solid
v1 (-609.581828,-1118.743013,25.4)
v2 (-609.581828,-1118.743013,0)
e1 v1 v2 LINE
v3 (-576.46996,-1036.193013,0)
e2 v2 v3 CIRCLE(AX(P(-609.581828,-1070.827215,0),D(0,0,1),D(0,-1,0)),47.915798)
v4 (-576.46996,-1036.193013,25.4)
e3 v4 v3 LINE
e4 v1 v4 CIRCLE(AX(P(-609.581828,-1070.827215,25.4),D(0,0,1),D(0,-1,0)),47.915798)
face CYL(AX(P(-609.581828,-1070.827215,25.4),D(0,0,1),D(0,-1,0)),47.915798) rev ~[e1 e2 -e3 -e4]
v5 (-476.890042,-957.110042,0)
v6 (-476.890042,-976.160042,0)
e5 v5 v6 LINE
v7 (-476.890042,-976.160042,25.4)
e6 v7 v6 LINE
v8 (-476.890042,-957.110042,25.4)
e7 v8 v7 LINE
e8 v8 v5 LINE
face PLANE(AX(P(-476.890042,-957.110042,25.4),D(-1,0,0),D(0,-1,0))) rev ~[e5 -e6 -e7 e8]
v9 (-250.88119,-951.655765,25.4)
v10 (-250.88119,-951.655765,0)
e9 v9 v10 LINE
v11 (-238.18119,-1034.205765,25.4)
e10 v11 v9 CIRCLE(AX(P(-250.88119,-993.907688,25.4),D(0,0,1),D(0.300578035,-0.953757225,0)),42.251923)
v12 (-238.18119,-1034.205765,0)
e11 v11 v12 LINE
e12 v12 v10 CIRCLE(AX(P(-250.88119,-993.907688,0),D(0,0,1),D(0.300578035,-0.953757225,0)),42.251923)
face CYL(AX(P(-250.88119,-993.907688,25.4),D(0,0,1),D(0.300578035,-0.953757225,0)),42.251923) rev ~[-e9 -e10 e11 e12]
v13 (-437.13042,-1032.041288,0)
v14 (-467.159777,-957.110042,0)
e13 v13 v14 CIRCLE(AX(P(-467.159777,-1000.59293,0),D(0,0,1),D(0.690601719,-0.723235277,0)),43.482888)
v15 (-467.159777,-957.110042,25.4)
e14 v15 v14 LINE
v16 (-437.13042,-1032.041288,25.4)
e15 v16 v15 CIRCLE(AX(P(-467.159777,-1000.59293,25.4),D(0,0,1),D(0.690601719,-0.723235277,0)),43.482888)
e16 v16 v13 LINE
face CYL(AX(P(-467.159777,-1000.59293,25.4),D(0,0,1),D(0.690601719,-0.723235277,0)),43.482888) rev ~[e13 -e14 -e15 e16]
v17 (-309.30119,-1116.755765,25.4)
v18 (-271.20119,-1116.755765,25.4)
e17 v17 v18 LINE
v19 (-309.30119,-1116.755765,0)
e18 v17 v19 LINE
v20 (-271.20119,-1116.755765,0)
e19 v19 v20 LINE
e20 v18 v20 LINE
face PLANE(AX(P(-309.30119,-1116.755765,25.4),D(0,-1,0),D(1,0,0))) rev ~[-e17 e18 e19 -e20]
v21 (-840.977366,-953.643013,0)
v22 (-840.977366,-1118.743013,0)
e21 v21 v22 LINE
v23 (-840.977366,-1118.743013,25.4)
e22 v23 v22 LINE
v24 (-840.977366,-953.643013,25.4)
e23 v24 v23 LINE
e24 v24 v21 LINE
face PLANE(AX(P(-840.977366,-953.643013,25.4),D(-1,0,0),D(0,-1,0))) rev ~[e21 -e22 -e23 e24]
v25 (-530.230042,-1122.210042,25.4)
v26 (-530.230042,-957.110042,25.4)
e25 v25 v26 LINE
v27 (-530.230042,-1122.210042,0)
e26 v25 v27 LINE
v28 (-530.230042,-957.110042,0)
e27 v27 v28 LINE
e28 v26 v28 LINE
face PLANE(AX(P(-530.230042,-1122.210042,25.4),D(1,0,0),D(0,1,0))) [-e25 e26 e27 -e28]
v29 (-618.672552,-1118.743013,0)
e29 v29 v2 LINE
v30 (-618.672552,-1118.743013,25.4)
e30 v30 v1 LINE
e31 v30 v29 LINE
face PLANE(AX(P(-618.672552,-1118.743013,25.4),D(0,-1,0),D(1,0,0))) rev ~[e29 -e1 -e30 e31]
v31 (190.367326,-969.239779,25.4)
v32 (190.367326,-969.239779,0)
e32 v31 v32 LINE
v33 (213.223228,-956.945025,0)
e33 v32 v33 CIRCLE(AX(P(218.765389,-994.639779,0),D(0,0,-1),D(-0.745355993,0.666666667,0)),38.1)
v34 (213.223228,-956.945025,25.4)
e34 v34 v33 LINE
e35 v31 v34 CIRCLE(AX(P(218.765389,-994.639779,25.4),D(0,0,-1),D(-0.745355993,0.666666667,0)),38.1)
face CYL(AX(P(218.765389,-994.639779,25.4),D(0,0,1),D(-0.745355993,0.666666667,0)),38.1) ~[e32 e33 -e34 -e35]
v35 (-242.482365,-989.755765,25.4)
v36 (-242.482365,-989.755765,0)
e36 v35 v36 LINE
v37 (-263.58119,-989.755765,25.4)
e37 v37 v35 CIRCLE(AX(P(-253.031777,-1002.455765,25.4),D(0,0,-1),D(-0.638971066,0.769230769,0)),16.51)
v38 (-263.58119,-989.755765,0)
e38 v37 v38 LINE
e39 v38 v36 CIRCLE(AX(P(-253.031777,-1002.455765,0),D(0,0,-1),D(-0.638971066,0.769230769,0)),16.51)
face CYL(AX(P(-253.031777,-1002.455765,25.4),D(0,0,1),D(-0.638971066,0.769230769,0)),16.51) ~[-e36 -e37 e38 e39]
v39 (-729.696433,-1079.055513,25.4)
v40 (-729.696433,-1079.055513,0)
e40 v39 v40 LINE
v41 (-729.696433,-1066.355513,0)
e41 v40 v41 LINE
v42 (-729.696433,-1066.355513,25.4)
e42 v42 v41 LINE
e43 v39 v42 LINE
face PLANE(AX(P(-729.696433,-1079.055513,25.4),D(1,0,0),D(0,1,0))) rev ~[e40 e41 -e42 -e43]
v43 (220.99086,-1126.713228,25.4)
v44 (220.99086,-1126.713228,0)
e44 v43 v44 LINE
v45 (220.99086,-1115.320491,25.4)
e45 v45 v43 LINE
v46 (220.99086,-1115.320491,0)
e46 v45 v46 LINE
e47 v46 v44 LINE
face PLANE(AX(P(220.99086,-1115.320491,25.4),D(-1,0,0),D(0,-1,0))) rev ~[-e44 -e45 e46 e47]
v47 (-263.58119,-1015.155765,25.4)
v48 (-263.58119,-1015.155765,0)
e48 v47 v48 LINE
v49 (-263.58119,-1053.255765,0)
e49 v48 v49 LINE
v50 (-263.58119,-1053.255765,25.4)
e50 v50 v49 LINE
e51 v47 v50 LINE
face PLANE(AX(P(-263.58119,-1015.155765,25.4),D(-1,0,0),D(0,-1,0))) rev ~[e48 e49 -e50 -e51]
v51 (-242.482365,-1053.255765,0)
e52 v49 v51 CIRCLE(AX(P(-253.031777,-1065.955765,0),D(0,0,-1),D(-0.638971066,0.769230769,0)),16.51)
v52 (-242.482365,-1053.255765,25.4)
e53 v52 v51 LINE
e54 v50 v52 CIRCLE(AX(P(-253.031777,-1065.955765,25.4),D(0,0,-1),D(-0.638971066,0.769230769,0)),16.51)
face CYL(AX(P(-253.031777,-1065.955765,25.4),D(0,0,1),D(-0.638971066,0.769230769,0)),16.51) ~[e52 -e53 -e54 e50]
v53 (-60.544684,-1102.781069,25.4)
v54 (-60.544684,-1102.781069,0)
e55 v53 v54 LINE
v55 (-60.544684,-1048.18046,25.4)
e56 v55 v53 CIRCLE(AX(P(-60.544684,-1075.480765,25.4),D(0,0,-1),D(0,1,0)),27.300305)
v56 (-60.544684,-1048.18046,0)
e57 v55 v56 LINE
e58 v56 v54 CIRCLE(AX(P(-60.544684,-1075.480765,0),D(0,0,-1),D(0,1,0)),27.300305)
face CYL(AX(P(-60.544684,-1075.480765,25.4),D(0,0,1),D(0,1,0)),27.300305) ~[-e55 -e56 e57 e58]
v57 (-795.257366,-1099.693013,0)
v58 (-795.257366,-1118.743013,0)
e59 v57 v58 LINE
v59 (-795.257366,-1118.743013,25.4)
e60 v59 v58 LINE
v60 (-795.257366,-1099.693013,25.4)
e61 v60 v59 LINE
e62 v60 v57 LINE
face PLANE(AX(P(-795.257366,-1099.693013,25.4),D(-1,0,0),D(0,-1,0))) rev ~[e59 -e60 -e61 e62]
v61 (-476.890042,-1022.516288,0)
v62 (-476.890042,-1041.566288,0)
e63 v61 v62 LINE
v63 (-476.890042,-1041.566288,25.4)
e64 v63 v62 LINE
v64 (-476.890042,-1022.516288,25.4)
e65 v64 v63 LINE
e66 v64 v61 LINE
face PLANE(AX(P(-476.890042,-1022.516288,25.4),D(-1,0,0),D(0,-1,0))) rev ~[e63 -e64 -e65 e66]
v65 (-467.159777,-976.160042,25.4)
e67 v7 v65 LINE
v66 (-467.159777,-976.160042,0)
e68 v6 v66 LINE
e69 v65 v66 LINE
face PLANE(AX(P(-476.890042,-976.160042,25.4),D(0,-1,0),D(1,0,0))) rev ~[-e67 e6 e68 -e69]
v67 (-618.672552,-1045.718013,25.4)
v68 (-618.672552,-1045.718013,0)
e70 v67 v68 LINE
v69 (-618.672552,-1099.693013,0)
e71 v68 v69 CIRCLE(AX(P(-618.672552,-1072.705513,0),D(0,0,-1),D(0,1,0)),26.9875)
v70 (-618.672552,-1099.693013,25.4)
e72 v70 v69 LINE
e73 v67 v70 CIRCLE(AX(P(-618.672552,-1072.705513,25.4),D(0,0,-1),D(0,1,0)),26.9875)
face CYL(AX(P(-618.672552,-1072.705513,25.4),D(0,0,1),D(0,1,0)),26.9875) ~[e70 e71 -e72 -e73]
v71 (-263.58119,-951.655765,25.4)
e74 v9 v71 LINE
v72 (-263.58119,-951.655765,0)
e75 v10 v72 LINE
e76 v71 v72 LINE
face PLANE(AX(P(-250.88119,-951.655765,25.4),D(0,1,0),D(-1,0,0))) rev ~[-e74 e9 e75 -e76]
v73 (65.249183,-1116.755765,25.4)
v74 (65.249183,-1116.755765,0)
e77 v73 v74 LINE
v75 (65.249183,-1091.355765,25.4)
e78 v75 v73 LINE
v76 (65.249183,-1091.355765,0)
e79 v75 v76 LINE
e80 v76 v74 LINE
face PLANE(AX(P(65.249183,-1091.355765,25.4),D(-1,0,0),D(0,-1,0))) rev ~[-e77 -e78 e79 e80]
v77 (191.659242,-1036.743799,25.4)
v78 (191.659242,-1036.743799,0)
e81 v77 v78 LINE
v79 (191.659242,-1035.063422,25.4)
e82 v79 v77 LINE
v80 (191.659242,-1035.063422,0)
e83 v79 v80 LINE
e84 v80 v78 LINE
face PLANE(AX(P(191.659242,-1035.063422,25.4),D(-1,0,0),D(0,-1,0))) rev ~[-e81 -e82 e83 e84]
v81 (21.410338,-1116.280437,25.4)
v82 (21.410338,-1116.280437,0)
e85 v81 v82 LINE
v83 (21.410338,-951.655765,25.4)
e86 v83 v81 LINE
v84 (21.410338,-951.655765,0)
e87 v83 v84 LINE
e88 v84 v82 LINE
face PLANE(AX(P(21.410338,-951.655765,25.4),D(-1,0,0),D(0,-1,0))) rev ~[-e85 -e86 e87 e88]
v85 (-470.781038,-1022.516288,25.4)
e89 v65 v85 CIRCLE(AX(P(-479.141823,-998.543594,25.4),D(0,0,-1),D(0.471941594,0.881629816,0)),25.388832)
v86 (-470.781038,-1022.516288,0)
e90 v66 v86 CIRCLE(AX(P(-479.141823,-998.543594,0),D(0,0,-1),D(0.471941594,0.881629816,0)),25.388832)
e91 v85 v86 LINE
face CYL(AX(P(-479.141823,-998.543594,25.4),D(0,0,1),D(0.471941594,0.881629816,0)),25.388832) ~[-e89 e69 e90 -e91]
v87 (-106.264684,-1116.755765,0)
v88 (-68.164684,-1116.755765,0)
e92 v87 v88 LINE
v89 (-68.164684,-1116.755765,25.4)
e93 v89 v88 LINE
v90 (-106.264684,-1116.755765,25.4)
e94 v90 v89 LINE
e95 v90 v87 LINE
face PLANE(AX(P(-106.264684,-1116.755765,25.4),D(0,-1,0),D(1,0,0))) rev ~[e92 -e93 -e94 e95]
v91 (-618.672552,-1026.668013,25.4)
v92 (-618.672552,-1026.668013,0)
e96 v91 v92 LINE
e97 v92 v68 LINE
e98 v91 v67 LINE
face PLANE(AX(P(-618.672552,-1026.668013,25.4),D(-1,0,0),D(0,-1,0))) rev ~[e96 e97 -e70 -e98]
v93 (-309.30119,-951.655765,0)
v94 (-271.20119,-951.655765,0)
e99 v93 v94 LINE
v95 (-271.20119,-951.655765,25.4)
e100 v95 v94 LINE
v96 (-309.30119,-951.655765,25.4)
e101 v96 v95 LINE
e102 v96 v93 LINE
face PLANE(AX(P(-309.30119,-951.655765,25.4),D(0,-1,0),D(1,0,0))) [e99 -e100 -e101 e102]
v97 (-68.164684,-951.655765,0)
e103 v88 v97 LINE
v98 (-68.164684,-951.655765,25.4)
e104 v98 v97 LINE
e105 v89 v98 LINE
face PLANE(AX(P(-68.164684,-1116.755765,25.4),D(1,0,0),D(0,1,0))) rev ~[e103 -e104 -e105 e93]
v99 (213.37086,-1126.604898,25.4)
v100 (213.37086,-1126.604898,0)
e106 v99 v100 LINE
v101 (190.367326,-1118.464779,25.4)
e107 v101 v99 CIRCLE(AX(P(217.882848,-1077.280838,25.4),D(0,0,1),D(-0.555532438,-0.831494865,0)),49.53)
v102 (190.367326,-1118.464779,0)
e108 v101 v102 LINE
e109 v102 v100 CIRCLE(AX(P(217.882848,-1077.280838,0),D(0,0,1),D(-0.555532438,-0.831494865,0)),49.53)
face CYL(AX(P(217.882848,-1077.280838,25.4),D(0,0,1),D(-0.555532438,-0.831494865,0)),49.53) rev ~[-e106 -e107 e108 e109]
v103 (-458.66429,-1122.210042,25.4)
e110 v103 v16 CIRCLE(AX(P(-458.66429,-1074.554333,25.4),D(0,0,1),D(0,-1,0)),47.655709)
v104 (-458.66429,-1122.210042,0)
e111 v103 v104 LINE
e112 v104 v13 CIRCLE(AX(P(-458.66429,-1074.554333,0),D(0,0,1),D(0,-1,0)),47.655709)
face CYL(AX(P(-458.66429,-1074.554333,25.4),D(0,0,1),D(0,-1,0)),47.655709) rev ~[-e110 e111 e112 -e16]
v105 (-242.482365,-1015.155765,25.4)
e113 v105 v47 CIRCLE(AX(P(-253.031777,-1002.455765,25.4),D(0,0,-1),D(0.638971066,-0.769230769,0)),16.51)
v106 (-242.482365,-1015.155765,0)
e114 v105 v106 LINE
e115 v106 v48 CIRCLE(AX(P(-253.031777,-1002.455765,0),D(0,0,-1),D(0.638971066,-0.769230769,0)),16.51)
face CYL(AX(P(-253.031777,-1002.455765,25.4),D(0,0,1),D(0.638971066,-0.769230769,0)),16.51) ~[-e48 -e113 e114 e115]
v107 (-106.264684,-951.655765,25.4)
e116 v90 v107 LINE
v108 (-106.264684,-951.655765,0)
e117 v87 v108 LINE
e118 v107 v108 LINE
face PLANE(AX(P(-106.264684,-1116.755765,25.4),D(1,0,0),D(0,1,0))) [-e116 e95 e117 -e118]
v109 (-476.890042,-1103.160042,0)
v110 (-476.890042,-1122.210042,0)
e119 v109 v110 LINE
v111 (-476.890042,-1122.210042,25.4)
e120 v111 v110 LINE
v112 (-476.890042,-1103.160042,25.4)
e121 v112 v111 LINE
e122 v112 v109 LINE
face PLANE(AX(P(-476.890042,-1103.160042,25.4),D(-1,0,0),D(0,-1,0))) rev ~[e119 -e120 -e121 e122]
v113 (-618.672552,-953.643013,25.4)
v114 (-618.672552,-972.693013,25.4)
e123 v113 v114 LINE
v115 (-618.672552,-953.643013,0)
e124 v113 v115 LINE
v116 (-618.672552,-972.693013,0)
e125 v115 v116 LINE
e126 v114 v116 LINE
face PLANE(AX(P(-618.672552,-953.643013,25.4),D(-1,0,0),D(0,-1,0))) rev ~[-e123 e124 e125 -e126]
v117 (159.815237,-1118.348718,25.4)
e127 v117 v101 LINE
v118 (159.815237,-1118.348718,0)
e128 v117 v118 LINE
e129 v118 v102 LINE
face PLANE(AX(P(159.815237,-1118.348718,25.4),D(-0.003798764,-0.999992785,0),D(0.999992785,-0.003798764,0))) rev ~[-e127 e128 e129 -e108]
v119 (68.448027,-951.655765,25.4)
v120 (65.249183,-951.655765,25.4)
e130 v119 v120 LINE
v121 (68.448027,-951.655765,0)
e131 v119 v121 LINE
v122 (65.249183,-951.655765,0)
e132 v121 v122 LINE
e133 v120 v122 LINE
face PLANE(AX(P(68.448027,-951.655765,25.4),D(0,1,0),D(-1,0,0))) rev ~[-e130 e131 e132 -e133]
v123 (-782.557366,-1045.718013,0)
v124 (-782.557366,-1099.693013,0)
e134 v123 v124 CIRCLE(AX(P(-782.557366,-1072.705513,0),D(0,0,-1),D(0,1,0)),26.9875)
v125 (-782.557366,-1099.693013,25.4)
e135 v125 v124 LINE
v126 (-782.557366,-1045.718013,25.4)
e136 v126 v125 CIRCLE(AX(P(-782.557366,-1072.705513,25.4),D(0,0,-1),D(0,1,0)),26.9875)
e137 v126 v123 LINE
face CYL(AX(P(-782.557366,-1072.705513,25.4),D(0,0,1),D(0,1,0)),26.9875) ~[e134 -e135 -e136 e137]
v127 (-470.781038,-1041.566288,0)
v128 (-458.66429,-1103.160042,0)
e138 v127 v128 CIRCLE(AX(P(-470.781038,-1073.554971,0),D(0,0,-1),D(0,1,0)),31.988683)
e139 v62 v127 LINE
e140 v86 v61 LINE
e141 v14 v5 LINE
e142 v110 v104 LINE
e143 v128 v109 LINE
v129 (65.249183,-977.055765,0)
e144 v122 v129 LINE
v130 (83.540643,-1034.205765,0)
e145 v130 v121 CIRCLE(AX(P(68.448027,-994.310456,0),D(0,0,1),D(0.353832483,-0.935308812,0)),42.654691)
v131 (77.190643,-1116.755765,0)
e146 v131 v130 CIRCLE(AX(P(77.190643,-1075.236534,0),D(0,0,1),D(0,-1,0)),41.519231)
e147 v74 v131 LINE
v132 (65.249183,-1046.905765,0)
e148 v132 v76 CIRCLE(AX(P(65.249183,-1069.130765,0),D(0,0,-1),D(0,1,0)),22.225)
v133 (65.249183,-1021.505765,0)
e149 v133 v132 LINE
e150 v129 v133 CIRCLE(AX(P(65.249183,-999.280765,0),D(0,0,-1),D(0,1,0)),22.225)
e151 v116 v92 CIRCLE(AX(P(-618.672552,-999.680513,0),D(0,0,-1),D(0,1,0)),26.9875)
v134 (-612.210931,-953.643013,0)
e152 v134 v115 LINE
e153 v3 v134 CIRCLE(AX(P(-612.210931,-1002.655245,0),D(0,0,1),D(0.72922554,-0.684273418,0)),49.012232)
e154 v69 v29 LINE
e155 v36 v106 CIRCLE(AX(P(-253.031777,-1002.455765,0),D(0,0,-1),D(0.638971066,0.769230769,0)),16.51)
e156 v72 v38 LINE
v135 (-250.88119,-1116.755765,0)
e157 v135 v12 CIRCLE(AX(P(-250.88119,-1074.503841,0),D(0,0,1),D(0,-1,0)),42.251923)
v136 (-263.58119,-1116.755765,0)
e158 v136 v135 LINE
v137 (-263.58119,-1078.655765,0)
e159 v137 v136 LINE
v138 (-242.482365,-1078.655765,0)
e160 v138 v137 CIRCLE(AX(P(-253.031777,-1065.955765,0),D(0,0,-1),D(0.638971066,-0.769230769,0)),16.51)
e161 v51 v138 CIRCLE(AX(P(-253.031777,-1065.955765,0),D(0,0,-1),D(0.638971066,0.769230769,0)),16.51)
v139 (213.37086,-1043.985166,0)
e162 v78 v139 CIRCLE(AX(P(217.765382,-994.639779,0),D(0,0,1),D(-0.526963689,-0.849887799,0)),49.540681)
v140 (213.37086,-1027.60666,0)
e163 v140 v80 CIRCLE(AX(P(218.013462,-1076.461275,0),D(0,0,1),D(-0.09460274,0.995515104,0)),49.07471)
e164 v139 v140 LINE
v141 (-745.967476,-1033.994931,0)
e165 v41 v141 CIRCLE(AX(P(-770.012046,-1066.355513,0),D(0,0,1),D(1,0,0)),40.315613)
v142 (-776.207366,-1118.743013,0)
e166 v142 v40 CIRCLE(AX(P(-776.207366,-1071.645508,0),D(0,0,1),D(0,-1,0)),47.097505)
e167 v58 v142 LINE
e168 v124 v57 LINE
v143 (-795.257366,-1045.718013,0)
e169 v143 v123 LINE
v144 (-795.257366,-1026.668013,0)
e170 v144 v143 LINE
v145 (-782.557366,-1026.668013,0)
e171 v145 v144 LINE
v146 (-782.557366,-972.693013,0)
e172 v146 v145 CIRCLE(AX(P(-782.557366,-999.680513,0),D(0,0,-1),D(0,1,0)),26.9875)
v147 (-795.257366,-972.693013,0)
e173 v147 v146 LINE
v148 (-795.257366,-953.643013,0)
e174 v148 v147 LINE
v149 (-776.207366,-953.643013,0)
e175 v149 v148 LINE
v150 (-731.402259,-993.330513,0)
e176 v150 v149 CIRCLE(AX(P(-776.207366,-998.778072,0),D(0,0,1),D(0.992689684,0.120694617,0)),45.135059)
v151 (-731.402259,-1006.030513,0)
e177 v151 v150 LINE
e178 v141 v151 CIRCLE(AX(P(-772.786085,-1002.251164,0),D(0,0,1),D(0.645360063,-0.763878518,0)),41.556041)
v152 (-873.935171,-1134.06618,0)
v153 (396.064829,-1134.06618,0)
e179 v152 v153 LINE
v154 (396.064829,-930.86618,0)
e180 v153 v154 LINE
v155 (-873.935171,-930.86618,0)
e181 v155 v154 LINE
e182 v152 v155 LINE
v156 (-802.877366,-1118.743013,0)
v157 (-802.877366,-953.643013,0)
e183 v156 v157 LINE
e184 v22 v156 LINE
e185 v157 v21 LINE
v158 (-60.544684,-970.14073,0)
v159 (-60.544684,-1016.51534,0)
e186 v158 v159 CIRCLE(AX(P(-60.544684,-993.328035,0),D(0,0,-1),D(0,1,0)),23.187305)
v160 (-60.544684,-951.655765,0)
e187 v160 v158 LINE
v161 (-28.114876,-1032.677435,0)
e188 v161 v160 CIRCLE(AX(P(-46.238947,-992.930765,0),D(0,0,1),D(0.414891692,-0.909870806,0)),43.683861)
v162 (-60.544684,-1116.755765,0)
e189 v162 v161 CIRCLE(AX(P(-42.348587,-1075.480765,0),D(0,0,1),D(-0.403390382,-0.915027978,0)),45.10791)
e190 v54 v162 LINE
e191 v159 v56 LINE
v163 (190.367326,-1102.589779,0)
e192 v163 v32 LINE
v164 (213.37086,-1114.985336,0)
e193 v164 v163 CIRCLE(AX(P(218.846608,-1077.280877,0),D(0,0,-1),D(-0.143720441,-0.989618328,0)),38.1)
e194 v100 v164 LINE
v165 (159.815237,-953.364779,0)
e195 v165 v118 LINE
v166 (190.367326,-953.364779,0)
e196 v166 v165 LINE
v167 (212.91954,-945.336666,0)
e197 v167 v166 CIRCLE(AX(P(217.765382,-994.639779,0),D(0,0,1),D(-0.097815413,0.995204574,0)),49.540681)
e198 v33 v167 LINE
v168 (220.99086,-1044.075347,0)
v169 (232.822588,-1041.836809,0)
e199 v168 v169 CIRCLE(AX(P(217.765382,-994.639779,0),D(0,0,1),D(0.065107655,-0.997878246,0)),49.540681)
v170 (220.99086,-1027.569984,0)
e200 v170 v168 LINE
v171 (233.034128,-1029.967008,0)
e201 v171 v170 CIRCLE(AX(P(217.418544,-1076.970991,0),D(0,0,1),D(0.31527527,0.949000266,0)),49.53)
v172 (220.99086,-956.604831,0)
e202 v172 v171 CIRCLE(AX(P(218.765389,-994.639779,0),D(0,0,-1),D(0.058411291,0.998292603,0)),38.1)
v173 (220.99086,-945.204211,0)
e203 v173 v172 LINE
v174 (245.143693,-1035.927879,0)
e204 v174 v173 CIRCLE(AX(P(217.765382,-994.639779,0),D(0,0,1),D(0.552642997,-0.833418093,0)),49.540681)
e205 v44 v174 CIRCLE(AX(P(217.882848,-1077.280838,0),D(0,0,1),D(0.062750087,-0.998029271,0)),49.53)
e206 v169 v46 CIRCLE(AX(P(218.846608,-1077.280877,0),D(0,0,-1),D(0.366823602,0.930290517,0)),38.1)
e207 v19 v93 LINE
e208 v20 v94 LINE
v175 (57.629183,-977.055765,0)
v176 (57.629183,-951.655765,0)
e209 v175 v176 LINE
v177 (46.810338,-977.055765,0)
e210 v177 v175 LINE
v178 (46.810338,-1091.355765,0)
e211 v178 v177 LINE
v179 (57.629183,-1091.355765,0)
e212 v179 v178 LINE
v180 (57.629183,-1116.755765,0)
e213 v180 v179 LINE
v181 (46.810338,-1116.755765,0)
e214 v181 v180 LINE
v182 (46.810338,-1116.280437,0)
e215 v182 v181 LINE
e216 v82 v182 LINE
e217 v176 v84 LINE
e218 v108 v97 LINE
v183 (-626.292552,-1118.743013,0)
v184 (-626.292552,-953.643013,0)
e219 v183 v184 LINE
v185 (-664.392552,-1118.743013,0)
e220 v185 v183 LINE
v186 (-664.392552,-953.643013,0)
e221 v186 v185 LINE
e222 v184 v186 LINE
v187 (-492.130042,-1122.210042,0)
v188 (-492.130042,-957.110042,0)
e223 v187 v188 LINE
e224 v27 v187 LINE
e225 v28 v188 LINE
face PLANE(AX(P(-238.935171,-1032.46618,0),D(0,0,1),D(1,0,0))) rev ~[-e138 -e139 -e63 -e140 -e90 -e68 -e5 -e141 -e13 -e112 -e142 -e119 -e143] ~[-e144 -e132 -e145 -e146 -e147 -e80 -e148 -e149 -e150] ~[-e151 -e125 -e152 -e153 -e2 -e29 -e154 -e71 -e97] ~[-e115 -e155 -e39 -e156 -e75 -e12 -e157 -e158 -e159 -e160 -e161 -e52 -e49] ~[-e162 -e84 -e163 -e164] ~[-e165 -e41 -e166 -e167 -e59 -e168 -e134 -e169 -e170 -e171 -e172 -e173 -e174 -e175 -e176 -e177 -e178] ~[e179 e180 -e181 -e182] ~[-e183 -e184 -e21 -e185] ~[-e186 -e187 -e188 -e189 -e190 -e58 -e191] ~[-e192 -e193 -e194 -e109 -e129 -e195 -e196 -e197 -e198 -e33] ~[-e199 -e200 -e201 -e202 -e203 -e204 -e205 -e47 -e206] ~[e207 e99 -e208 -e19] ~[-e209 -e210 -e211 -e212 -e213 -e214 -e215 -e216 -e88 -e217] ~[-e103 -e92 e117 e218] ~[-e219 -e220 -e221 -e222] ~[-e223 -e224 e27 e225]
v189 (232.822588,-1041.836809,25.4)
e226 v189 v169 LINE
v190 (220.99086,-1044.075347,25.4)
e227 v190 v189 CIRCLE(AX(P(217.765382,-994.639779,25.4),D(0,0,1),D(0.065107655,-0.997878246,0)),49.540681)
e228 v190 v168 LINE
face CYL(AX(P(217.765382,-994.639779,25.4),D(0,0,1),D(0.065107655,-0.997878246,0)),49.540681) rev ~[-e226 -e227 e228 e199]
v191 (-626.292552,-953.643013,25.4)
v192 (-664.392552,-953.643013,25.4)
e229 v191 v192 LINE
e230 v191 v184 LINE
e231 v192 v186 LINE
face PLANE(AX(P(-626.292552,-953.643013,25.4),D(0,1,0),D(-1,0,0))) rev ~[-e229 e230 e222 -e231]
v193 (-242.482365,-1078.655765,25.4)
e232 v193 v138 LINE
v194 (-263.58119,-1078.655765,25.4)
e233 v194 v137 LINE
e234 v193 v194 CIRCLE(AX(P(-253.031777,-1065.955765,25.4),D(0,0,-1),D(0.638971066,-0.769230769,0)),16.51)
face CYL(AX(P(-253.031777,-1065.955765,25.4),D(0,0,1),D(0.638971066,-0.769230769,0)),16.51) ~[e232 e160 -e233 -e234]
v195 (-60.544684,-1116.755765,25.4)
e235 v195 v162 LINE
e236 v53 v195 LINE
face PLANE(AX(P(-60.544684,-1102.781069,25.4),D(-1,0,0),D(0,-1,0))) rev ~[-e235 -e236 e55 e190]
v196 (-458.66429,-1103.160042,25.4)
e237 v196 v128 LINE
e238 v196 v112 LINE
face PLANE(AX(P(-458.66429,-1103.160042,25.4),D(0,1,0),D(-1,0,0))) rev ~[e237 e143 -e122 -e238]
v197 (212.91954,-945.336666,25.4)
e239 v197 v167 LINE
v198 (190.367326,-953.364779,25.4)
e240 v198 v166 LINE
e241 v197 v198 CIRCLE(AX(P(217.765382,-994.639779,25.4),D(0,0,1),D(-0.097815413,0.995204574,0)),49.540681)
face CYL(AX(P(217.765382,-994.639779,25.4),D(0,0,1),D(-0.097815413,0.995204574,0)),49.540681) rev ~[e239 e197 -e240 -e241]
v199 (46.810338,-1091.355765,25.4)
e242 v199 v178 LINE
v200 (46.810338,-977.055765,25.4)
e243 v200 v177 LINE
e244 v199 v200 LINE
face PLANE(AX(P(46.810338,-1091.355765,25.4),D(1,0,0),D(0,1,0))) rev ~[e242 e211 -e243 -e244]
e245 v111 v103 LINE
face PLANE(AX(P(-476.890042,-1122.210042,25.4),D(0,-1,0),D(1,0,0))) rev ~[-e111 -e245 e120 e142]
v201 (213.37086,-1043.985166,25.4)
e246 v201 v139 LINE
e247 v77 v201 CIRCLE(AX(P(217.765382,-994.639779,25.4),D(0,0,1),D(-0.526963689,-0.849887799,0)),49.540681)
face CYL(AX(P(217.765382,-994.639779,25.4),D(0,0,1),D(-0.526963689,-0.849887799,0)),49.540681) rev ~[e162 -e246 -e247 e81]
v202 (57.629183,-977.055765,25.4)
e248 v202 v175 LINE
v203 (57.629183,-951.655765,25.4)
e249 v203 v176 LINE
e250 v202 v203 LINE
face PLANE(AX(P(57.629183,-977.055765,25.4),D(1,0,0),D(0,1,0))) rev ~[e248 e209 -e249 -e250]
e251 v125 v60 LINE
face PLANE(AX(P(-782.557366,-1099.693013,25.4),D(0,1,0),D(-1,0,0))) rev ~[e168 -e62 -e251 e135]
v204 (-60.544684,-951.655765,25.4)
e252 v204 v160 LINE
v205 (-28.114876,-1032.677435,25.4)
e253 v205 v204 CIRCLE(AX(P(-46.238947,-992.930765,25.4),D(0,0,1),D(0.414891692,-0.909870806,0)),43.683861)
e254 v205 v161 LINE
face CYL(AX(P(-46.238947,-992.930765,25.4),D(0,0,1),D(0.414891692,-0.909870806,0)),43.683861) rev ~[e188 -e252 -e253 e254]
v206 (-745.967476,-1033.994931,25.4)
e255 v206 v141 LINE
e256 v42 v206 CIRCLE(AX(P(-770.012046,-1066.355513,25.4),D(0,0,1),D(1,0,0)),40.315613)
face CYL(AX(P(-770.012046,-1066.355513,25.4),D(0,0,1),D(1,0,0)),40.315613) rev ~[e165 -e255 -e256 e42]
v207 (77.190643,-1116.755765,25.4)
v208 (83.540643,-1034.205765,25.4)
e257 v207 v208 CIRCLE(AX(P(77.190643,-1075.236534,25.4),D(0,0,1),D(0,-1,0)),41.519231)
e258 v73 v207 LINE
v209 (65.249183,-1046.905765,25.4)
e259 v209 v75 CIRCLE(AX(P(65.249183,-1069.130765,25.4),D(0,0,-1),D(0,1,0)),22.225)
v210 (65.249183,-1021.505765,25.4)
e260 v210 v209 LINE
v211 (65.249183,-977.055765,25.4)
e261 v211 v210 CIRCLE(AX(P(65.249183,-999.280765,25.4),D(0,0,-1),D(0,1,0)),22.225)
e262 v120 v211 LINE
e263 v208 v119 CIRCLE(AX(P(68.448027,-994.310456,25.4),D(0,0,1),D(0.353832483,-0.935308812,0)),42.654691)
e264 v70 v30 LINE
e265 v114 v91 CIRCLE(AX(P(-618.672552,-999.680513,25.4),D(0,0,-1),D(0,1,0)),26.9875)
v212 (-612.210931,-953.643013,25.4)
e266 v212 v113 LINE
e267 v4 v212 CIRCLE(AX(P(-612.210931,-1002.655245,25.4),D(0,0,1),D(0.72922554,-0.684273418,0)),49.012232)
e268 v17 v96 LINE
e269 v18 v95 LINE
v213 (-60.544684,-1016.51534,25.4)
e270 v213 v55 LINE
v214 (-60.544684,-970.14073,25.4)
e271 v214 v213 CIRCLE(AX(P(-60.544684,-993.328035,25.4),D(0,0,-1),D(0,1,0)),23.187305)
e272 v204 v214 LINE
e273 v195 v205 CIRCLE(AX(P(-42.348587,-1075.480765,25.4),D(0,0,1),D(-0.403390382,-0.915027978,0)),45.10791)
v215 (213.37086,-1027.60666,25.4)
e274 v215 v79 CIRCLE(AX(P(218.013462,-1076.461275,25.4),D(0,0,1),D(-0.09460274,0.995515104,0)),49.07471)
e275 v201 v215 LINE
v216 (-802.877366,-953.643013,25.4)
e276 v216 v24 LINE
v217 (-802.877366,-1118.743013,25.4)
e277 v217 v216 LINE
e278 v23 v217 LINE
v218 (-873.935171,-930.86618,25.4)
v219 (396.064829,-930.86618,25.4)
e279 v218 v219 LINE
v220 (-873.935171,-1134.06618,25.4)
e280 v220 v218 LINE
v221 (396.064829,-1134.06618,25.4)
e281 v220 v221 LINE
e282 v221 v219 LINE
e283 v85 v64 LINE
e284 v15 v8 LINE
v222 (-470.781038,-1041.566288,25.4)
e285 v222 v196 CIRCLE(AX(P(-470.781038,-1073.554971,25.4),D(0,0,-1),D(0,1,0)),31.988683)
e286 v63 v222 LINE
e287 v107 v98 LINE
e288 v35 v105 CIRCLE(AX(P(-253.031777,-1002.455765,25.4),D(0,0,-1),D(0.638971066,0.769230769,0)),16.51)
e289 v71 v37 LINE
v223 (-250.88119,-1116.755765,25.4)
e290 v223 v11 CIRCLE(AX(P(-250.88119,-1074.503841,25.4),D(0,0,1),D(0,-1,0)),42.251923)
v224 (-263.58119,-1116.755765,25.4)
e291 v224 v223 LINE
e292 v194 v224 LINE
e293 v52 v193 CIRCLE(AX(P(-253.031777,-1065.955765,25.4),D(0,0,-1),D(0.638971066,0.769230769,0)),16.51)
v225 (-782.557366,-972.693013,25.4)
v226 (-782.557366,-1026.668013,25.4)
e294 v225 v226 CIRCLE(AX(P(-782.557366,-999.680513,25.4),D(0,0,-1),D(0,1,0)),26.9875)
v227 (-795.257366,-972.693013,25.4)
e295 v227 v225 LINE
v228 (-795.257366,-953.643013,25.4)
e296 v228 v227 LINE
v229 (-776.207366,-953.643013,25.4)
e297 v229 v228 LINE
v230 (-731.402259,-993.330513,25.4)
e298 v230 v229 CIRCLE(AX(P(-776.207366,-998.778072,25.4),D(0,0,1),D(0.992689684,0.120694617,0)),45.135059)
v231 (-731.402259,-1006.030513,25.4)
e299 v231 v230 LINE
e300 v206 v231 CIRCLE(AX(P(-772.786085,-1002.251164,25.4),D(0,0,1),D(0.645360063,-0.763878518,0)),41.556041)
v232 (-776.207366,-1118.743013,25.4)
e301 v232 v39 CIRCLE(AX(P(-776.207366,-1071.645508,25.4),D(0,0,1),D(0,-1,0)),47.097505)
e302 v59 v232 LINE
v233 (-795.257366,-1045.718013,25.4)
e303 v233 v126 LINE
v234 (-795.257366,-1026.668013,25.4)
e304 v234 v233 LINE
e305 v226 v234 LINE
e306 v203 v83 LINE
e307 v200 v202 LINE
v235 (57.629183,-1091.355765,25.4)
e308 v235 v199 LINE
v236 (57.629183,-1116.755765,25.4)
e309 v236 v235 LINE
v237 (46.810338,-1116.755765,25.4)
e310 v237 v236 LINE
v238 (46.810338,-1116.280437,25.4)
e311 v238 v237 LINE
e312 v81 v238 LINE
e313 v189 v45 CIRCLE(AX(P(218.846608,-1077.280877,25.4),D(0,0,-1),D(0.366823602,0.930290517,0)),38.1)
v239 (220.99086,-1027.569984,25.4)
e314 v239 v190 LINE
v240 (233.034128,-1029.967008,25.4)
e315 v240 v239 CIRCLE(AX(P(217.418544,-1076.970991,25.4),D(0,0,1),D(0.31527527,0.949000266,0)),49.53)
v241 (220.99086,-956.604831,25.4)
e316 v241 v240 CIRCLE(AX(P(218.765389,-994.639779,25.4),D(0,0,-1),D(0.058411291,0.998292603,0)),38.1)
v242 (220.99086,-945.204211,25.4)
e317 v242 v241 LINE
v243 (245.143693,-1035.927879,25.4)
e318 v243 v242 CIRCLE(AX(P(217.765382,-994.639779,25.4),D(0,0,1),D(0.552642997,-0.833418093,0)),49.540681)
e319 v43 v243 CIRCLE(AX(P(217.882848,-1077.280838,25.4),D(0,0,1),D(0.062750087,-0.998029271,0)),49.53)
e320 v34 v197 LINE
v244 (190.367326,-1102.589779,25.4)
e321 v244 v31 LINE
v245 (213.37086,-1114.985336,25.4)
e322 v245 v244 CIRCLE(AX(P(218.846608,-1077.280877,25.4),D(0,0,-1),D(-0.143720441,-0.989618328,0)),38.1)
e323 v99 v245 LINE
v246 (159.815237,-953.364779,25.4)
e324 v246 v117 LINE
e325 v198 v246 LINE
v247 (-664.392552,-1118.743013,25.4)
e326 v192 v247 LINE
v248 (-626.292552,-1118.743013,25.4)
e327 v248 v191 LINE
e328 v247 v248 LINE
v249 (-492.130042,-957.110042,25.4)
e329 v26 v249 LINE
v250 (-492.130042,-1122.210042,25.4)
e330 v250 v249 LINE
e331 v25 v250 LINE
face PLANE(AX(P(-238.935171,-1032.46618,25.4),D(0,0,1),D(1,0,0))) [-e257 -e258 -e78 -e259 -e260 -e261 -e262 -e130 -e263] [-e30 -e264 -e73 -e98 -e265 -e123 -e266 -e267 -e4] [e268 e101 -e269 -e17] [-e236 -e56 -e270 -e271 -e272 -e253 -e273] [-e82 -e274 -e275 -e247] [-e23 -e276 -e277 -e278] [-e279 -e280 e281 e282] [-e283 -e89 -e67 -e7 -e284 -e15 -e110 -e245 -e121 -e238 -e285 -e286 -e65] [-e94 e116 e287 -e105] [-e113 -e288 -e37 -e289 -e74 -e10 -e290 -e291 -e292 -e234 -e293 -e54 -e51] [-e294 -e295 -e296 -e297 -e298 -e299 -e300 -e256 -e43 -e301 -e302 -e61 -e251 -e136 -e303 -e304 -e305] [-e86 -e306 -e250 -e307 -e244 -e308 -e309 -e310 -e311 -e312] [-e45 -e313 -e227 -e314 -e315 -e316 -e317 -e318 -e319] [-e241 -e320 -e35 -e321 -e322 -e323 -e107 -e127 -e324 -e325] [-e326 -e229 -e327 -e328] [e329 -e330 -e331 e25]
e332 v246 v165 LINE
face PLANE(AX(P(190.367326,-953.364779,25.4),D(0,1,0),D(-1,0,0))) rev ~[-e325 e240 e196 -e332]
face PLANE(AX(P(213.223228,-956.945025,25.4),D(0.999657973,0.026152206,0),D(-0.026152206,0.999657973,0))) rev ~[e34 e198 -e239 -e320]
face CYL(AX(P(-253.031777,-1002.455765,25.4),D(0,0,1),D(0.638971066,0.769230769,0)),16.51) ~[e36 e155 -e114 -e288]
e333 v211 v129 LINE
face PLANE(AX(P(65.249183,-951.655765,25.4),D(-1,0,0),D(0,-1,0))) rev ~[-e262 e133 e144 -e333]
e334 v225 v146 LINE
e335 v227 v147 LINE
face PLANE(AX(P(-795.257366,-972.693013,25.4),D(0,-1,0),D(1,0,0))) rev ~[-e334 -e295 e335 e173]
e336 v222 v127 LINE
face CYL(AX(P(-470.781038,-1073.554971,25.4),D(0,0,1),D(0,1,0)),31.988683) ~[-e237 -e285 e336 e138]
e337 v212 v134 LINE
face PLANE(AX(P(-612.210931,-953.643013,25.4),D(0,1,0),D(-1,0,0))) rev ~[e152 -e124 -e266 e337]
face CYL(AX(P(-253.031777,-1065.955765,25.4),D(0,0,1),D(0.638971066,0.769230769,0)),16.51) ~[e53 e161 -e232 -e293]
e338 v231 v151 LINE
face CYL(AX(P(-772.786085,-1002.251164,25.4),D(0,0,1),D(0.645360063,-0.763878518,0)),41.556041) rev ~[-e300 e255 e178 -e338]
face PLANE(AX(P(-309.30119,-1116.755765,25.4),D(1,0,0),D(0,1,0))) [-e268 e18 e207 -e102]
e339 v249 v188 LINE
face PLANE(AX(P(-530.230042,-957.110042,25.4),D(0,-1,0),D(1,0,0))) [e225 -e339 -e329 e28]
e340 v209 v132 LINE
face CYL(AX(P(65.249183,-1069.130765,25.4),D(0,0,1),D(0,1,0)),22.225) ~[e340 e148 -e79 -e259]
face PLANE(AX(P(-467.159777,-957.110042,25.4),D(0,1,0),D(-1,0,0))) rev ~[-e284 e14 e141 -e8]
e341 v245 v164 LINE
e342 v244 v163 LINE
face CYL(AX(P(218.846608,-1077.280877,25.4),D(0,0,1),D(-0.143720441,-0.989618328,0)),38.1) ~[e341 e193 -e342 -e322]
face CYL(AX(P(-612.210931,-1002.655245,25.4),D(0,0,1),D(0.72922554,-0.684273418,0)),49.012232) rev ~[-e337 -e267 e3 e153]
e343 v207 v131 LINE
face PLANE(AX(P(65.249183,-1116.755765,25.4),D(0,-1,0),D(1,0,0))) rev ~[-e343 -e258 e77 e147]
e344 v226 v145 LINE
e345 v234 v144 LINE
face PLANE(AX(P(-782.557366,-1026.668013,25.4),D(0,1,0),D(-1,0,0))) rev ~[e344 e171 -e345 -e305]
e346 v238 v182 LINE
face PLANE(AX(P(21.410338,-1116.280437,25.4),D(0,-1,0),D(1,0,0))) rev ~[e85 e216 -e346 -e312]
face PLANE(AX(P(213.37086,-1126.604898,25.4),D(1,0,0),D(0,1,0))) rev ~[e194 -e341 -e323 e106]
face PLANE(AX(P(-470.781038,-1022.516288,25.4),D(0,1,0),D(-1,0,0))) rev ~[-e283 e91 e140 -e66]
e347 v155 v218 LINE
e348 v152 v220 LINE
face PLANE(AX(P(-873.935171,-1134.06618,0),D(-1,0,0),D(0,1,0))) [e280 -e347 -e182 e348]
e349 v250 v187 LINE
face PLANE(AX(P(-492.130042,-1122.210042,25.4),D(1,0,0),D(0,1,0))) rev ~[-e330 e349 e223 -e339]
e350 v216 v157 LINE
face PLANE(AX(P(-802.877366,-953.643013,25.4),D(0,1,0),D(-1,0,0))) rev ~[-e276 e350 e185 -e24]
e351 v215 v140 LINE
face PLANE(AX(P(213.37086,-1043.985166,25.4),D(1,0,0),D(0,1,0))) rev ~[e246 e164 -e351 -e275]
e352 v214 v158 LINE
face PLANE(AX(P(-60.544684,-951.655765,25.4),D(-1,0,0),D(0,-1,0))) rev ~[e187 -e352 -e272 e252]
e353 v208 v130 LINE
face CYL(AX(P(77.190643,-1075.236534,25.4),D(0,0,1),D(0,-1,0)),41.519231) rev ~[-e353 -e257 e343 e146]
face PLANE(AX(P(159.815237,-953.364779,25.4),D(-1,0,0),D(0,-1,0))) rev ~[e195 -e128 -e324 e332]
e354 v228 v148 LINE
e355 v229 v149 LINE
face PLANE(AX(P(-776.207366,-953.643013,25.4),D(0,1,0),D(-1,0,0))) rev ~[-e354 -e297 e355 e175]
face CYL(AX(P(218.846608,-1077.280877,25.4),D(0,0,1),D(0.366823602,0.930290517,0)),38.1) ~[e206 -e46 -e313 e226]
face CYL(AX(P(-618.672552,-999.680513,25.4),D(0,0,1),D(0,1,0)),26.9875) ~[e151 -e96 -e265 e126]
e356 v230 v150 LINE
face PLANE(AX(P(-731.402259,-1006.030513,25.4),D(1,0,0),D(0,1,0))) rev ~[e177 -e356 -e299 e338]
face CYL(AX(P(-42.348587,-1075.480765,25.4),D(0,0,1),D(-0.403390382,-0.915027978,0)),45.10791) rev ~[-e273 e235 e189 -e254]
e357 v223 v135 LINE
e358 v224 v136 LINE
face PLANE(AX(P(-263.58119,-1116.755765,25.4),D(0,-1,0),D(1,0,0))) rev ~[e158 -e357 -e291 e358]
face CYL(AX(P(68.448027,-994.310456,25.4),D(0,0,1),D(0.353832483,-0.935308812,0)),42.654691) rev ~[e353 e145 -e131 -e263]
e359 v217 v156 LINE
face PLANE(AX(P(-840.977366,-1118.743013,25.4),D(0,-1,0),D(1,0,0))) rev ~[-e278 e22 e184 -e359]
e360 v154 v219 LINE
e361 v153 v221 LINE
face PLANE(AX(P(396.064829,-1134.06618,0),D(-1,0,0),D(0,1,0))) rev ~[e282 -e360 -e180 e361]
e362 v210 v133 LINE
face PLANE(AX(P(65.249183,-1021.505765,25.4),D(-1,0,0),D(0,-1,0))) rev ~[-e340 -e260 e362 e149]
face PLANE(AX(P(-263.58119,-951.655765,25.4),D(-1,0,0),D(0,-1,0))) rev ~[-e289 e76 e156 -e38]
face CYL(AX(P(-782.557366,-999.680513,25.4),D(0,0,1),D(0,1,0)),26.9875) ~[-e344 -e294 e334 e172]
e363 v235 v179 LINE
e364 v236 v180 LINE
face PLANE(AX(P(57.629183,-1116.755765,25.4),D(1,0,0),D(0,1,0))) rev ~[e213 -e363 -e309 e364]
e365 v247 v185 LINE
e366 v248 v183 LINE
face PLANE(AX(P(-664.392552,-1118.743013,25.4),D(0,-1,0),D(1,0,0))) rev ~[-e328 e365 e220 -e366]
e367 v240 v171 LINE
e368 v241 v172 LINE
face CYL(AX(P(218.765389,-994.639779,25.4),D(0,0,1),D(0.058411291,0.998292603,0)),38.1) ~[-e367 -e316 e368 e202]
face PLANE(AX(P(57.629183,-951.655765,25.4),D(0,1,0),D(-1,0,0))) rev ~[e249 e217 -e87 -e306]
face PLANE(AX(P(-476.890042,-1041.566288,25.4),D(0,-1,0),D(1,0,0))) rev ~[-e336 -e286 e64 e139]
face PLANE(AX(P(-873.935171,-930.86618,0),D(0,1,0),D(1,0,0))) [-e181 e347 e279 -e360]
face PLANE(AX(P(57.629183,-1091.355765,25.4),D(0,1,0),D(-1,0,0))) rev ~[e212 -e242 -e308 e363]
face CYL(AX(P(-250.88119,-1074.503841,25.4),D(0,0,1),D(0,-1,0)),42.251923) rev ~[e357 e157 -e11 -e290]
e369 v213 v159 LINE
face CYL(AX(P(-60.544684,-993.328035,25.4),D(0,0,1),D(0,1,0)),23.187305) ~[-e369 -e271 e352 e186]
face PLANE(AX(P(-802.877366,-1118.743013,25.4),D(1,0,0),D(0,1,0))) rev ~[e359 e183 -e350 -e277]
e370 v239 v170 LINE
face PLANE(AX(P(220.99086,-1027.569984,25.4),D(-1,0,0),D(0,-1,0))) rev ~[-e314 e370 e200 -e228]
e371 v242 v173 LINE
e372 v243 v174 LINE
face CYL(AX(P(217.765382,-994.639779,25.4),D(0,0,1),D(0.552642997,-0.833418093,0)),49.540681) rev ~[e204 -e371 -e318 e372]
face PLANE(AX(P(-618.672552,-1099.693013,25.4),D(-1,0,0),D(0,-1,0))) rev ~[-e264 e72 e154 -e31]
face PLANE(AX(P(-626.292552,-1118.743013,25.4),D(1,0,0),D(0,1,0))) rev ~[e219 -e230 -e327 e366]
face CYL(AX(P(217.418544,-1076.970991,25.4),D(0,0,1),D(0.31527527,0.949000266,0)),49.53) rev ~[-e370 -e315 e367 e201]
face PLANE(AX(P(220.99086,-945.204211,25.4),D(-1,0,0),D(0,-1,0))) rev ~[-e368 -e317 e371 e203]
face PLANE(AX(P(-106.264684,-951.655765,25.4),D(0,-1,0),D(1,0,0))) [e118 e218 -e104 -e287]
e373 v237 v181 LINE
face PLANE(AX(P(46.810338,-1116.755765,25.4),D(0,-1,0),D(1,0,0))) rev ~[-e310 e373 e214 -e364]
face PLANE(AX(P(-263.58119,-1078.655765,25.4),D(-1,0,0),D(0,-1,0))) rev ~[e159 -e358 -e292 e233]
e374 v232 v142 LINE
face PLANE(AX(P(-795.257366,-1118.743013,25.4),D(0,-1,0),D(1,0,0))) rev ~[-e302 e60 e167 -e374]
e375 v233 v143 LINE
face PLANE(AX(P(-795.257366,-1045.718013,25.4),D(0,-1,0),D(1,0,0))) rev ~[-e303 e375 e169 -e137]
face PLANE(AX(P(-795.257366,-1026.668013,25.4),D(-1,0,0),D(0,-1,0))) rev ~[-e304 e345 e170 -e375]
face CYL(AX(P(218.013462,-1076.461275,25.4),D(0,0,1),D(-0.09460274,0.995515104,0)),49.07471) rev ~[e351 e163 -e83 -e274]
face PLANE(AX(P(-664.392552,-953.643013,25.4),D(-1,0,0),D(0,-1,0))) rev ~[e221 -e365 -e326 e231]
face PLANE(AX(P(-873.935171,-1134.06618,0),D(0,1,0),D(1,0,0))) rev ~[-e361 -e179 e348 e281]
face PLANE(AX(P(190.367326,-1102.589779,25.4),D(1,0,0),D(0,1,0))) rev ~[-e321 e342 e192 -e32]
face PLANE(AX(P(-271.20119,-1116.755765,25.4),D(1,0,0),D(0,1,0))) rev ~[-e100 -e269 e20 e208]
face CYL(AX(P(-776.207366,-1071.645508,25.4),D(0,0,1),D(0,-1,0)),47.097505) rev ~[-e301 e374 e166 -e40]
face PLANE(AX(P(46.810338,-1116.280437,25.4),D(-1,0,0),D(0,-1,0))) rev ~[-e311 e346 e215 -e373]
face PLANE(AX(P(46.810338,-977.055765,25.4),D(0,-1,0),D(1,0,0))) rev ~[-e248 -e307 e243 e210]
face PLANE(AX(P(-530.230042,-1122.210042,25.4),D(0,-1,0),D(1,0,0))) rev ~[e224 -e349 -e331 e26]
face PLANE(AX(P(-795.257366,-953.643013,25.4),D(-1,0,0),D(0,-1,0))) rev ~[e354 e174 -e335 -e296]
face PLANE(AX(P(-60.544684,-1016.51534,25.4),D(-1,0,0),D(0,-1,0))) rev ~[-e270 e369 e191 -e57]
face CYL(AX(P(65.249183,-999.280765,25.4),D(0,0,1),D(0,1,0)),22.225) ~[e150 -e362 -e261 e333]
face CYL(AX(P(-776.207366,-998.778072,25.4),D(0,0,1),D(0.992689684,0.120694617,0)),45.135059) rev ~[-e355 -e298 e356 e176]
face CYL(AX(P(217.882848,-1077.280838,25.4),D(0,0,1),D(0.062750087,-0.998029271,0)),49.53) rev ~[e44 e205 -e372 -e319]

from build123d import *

# Parameters (mm, degrees)
F0_W      = 1270
F0_H      = 203.2
F1_DEPTH  = 25.4
F3_DEPTH  = 25.4
F5_DEPTH  = 25.4
F6_W      = 38.1
F6_H      = 165.1
F7_DEPTH  = 25.4
F8_W      = 38.1
F8_H      = 165.1
F9_DEPTH  = 25.4
F10_W     = 38.1
F10_H     = 165.1
F11_DEPTH = 25.4
F12_W     = 10.8188445342
F12_H     = 25.4
F13_DEPTH = 25.4
F15_DEPTH = 25.4


# Not quite as in the source:
# - a feature names something its author has since deleted; it is built from what else it names


with BuildPart() as f1:
    # F0 (on Top) → F1 (new body)
    with BuildSketch(Plane.XY):
        with Locations((-238.9351708174, -1032.4661802616)):
            Rectangle(F0_W, F0_H)
    extrude(amount=F1_DEPTH)

    # F2 (on face) → F3 (cut)
    with BuildSketch(Plane.XY.offset(25.4)):
        Polygon((-802.8773658486, -953.6430131912), (-840.9773658486, -953.6430131912), (-840.9773658486, -1118.7430131912), (-802.8773658486, -1118.7430131912), (-802.8773658486, -1036.1930131912), align=None)
        with BuildLine():
            Line((-795.2573658486, -1026.6680131912), (-795.2573658486, -1034.9226884847))
            ThreePointArc((-795.2573658486, -1034.9226884847), (-770.7707510059, -1026.0470401418), (-745.9674756926, -1033.9949312892))
            ThreePointArc((-745.9674756926, -1033.9949312892), (-735.9296714012, -1021.4477610393), (-731.4022587776, -1006.0305131912))
            Line((-731.4022587776, -1006.0305131912), (-731.4022587776, -993.3305131912))
            ThreePointArc((-731.4022587776, -993.3305131912), (-746.2799733966, -964.9916145085), (-776.2073658486, -953.6430131912))
            Line((-776.2073658486, -953.6430131912), (-795.2573658486, -953.6430131912))
            Line((-795.2573658486, -953.6430131912), (-795.2573658486, -972.6930131912))
            Line((-795.2573658486, -972.6930131912), (-782.5573658486, -972.6930131912))
            ThreePointArc((-782.5573658486, -972.6930131912), (-755.5698658486, -999.6805131912), (-782.5573658486, -1026.6680131912))
            Line((-782.5573658486, -1026.6680131912), (-795.2573658486, -1026.6680131912))
        make_face()
        with BuildLine():
            ThreePointArc((-745.9674756926, -1033.9949312892), (-770.0833121416, -1043.7192190255), (-795.2573658486, -1037.2075096056))
            Line((-795.2573658486, -1037.2075096056), (-795.2573658486, -1045.7180131912))
            Line((-795.2573658486, -1045.7180131912), (-782.5573658486, -1045.7180131912))
            ThreePointArc((-782.5573658486, -1045.7180131912), (-755.5698658486, -1072.7055131912), (-782.5573658486, -1099.6930131912))
            Line((-782.5573658486, -1099.6930131912), (-795.2573658486, -1099.6930131912))
            Line((-795.2573658486, -1099.6930131912), (-795.2573658486, -1118.7430131912))
            Line((-795.2573658486, -1118.7430131912), (-776.2073658486, -1118.7430131912))
            ThreePointArc((-776.2073658486, -1118.7430131912), (-745.6362827432, -1107.4726468348), (-729.6964334488, -1079.0555131912))
            Line((-729.6964334488, -1079.0555131912), (-729.6964334488, -1066.3555131912))
            ThreePointArc((-729.6964334488, -1066.3555131912), (-733.9931607032, -1048.2450598787), (-745.9674756926, -1033.9949312892))
        make_face()
        with BuildLine():
            Line((-795.2573658486, -1034.9226884847), (-795.2573658486, -1036.1930131912))
            Line((-795.2573658486, -1036.1930131912), (-795.2573658486, -1037.2075096056))
            ThreePointArc((-795.2573658486, -1037.2075096056), (-770.0833121416, -1043.7192190255), (-745.9674756926, -1033.9949312892))
            ThreePointArc((-745.9674756926, -1033.9949312892), (-770.7707510059, -1026.0470401418), (-795.2573658486, -1034.9226884847))
        make_face()
    extrude(amount=-F3_DEPTH, mode=Mode.SUBTRACT)

    # F4 (on face) → F5 (cut)
    with BuildSketch(Plane.XY.offset(25.4)):
        Polygon((-626.2925520338, -953.6430131912), (-664.3925520338, -953.6430131912), (-664.3925520338, -1118.7430131912), (-626.2925520338, -1118.7430131912), (-626.2925520338, -1036.1930131912), align=None)
        with BuildLine():
            Line((-618.6725520338, -1026.6680131912), (-618.6725520338, -1036.1930131912))
            Line((-618.6725520338, -1036.1930131912), (-576.4699598814, -1036.1930131912))
            ThreePointArc((-576.4699598814, -1036.1930131912), (-567.2333827461, -983.181698655), (-612.2109314466, -953.6430131912))
            Line((-612.2109314466, -953.6430131912), (-618.6725520338, -953.6430131912))
            Line((-618.6725520338, -953.6430131912), (-618.6725520338, -972.6930131912))
            ThreePointArc((-618.6725520338, -972.6930131912), (-591.6850520338, -999.6805131912), (-618.6725520338, -1026.6680131912))
        make_face()
        with BuildLine():
            Line((-576.4699598814, -1036.1930131912), (-618.6725520338, -1036.1930131912))
            Line((-618.6725520338, -1036.1930131912), (-618.6725520338, -1045.7180131912))
            ThreePointArc((-618.6725520338, -1045.7180131912), (-591.6850520338, -1072.7055131912), (-618.6725520338, -1099.6930131912))
            Line((-618.6725520338, -1099.6930131912), (-618.6725520338, -1118.7430131912))
            Line((-618.6725520338, -1118.7430131912), (-609.5818281174, -1118.7430131912))
            ThreePointArc((-609.5818281174, -1118.7430131912), (-565.110212681, -1088.6653525193), (-576.4699598814, -1036.1930131912))
        make_face()
    extrude(amount=-F5_DEPTH, mode=Mode.SUBTRACT)

    # F6 (on face) → F7 (cut)
    with BuildSketch(Plane.XY.offset(25.4)):
        with Locations((-290.2511896121, -1034.2057645321)):
            Rectangle(F6_W, F6_H)
        with BuildLine():
            Line((-250.8811896121, -951.6557645321), (-263.5811896121, -951.6557645321))
            Line((-263.5811896121, -951.6557645321), (-263.5811896121, -989.7557645321))
            ThreePointArc((-263.5811896121, -989.7557645321), (-253.0317773062, -985.9457645321), (-242.4823650003, -989.7557645321))
            ThreePointArc((-242.4823650003, -989.7557645321), (-236.5217773062, -1002.4557645321), (-242.4823650003, -1015.1557645321))
            ThreePointArc((-242.4823650003, -1015.1557645321), (-253.0317773062, -1018.9657645321), (-263.5811896121, -1015.1557645321))
            Line((-263.5811896121, -1015.1557645321), (-263.5811896121, -1034.2057645321))
            Line((-263.5811896121, -1034.2057645321), (-238.1811896121, -1034.2057645321))
            ThreePointArc((-238.1811896121, -1034.2057645321), (-209.1205846715, -987.4829791566), (-250.8811896121, -951.6557645321))
        make_face()
        with BuildLine():
            ThreePointArc((-250.8811896121, -1116.7557645321), (-209.1205846715, -1080.9285499076), (-238.1811896121, -1034.2057645321))
            Line((-238.1811896121, -1034.2057645321), (-263.5811896121, -1034.2057645321))
            Line((-263.5811896121, -1034.2057645321), (-263.5811896121, -1053.2557645321))
            ThreePointArc((-263.5811896121, -1053.2557645321), (-253.0317773062, -1049.4457645321), (-242.4823650003, -1053.2557645321))
            ThreePointArc((-242.4823650003, -1053.2557645321), (-236.5217773062, -1065.9557645321), (-242.4823650003, -1078.6557645321))
            ThreePointArc((-242.4823650003, -1078.6557645321), (-253.0317773062, -1082.4657645321), (-263.5811896121, -1078.6557645321))
            Line((-263.5811896121, -1078.6557645321), (-263.5811896121, -1116.7557645321))
            Line((-263.5811896121, -1116.7557645321), (-250.8811896121, -1116.7557645321))
        make_face()
    extrude(amount=-F7_DEPTH, mode=Mode.SUBTRACT)

    # F8 (on face) → F9 (cut)
    with BuildSketch(Plane.XY.offset(25.4)):
        with Locations((-511.1800421023, -1039.6600419521)):
            Rectangle(F8_W, F8_H)
        with BuildLine():
            Line((-476.8900421023, -1103.1600419521), (-476.8900421023, -1122.2100419521))
            Line((-476.8900421023, -1122.2100419521), (-458.6642896088, -1122.2100419521))
            ThreePointArc((-458.6642896088, -1122.2100419521), (-412.3120735256, -1085.6240501252), (-437.1304200925, -1032.0412879019))
            ThreePointArc((-437.1304200925, -1032.0412879019), (-426.7974991694, -984.4173911629), (-467.1597770349, -957.1100419521))
            Line((-467.1597770349, -957.1100419521), (-476.8900421023, -957.1100419521))
            Line((-476.8900421023, -957.1100419521), (-476.8900421023, -976.1600419521))
            Line((-476.8900421023, -976.1600419521), (-467.1597770349, -976.1600419521))
            ThreePointArc((-467.1597770349, -976.1600419521), (-453.8301047521, -1000.5208961567), (-470.7810375499, -1022.5162879019))
            Line((-470.7810375499, -1022.5162879019), (-476.8900421023, -1022.5162879019))
            Line((-476.8900421023, -1022.5162879019), (-476.8900421023, -1041.5662879019))
            Line((-476.8900421023, -1041.5662879019), (-470.7810375499, -1041.5662879019))
            ThreePointArc((-470.7810375499, -1041.5662879019), (-439.3939139214, -1067.38048316), (-458.6642896088, -1103.1600419521))
            Line((-458.6642896088, -1103.1600419521), (-476.8900421023, -1103.1600419521))
        make_face()
    extrude(amount=-F9_DEPTH, mode=Mode.SUBTRACT)

    # F10 (on face) → F11 (cut)
    with BuildSketch(Plane.XY.offset(25.4)):
        with BuildLine():
            ThreePointArc((-28.1148758721, -1032.6774345846), (-5.6831499313, -976.6978639922), (-60.5446838784, -951.6557645321))
            Line((-60.5446838784, -951.6557645321), (-60.5446838784, -970.1407297723))
            ThreePointArc((-60.5446838784, -970.1407297723), (-37.3573787729, -993.3280348778), (-60.5446838784, -1016.5153399833))
            Line((-60.5446838784, -1016.5153399833), (-60.5446838784, -1048.1804596051))
            ThreePointArc((-60.5446838784, -1048.1804596051), (-33.2443789514, -1075.4807645321), (-60.5446838784, -1102.7810694591))
            Line((-60.5446838784, -1102.7810694591), (-60.5446838784, -1116.7557645321))
            ThreePointArc((-60.5446838784, -1116.7557645321), (-0.2627634404, -1091.713665072), (-28.1148758721, -1032.6774345846))
        make_face()
        with Locations((-87.2146838784, -1034.2057645321)):
            Rectangle(F10_W, F10_H)
    extrude(amount=-F11_DEPTH, mode=Mode.SUBTRACT)

    # F12 (on face) → F13 (cut)
    with BuildSketch(Plane.XY.offset(25.4)):
        Polygon((46.8103381641, -977.0557645321), (46.8103381641, -951.6557645321), (21.4103381641, -951.6557645321), (21.4103381641, -1116.2804365158), (46.8103381641, -1116.2804365158), (46.8103381641, -1091.3557645321), (46.8103381641, -1046.9057645321), (46.8103381641, -1034.2057645321), (46.8103381641, -1021.5057645321), align=None)
        with Locations((52.2197604311, -964.3557645321)):
            Rectangle(F12_W, F12_H)
        Polygon((46.8103381641, -1091.3557645321), (46.8103381641, -1116.2804365158), (46.8103381641, -1116.7557645321), (57.6291826982, -1116.7557645321), (57.6291826982, -1091.3557645321), align=None)
        with BuildLine():
            ThreePointArc((65.2491826982, -977.0557645321), (87.4741826982, -999.2807645321), (65.2491826982, -1021.5057645321))
            Line((65.2491826982, -1021.5057645321), (65.2491826982, -1034.2057645321))
            Line((65.2491826982, -1034.2057645321), (83.540642596, -1034.2057645321))
            ThreePointArc((83.540642596, -1034.2057645321), (110.4072024463, -986.6390604349), (68.4480272324, -951.6557645321))
            Line((68.4480272324, -951.6557645321), (65.2491826982, -951.6557645321))
            Line((65.2491826982, -951.6557645321), (65.2491826982, -977.0557645321))
        make_face()
        with BuildLine():
            Line((83.540642596, -1034.2057645321), (65.2491826982, -1034.2057645321))
            Line((65.2491826982, -1034.2057645321), (65.2491826982, -1046.9057645321))
            ThreePointArc((65.2491826982, -1046.9057645321), (87.4741826982, -1069.1307645321), (65.2491826982, -1091.3557645321))
            Line((65.2491826982, -1091.3557645321), (65.2491826982, -1116.7557645321))
            Line((65.2491826982, -1116.7557645321), (77.190642596, -1116.7557645321))
            ThreePointArc((77.190642596, -1116.7557645321), (118.587577869, -1078.4209133992), (83.540642596, -1034.2057645321))
        make_face()
    extrude(amount=-F13_DEPTH, mode=Mode.SUBTRACT)

    # F14 (on face) → F15 (cut)
    with BuildSketch(Plane.XY.offset(25.4)):
        with BuildLine():
            Line((213.370859623, -1126.6048977295), (213.370859623, -1114.9853357906))
            ThreePointArc((213.370859623, -1114.9853357906), (200.773188913, -1110.8213233384), (190.3673261404, -1102.5897787094))
            Line((190.3673261404, -1102.5897787094), (190.3673261404, -969.2397787094))
            ThreePointArc((190.3673261404, -969.2397787094), (200.7161524236, -961.0863132759), (213.2232278912, -956.9450251593))
            Line((213.2232278912, -956.9450251593), (212.9195398237, -945.3366661787))
            ThreePointArc((212.9195398237, -945.3366661787), (201.1512347814, -947.9680613325), (190.3673261404, -953.3647787094))
            Line((190.3673261404, -953.3647787094), (159.8152369261, -953.3647787094))
            Line((159.8152369261, -953.3647787094), (159.8152369261, -1118.3487176895))
            Line((159.8152369261, -1118.3487176895), (190.3673261404, -1118.4647787094))
            ThreePointArc((190.3673261404, -1118.4647787094), (201.3599627311, -1123.9736123253), (213.370859623, -1126.6048977295))
        make_face()
        with BuildLine():
            ThreePointArc((233.0341281328, -1029.9670075356), (227.08706533, -1028.3938294356), (220.990859623, -1027.569984006))
            Line((220.990859623, -1027.569984006), (220.990859623, -1044.0753467383))
            ThreePointArc((220.990859623, -1044.0753467383), (226.9749905665, -1043.3169006739), (232.8225876525, -1041.8368088181))
            ThreePointArc((232.8225876525, -1041.8368088181), (256.4621416526, -1083.337416125), (220.990859623, -1115.3204908886))
            Line((220.990859623, -1115.3204908886), (220.990859623, -1126.7132278679))
            ThreePointArc((220.990859623, -1126.7132278679), (265.7478847903, -1090.0150099575), (245.143692557, -1035.9278787521))
            ThreePointArc((245.143692557, -1035.9278787521), (265.6385890404, -981.8947740671), (220.990859623, -945.2042106805))
            Line((220.990859623, -945.2042106805), (220.990859623, -956.6048305363))
            ThreePointArc((220.990859623, -956.6048305363), (256.3621577318, -988.4678247955), (233.0341281328, -1029.9670075356))
        make_face()
        with BuildLine():
            Line((191.6592419147, -1035.0634215308), (191.6592419147, -1036.7437991805))
            ThreePointArc((191.6592419147, -1036.7437991805), (202.0911371494, -1041.6354927603), (213.370859623, -1043.9851661811))
            Line((213.370859623, -1043.9851661811), (213.370859623, -1027.6066599284))
            ThreePointArc((213.370859623, -1027.6066599284), (202.0728981967, -1030.0476390226), (191.6592419147, -1035.0634215308))
        make_face()
    extrude(amount=-F15_DEPTH, mode=Mode.SUBTRACT)


solid = f1.part
